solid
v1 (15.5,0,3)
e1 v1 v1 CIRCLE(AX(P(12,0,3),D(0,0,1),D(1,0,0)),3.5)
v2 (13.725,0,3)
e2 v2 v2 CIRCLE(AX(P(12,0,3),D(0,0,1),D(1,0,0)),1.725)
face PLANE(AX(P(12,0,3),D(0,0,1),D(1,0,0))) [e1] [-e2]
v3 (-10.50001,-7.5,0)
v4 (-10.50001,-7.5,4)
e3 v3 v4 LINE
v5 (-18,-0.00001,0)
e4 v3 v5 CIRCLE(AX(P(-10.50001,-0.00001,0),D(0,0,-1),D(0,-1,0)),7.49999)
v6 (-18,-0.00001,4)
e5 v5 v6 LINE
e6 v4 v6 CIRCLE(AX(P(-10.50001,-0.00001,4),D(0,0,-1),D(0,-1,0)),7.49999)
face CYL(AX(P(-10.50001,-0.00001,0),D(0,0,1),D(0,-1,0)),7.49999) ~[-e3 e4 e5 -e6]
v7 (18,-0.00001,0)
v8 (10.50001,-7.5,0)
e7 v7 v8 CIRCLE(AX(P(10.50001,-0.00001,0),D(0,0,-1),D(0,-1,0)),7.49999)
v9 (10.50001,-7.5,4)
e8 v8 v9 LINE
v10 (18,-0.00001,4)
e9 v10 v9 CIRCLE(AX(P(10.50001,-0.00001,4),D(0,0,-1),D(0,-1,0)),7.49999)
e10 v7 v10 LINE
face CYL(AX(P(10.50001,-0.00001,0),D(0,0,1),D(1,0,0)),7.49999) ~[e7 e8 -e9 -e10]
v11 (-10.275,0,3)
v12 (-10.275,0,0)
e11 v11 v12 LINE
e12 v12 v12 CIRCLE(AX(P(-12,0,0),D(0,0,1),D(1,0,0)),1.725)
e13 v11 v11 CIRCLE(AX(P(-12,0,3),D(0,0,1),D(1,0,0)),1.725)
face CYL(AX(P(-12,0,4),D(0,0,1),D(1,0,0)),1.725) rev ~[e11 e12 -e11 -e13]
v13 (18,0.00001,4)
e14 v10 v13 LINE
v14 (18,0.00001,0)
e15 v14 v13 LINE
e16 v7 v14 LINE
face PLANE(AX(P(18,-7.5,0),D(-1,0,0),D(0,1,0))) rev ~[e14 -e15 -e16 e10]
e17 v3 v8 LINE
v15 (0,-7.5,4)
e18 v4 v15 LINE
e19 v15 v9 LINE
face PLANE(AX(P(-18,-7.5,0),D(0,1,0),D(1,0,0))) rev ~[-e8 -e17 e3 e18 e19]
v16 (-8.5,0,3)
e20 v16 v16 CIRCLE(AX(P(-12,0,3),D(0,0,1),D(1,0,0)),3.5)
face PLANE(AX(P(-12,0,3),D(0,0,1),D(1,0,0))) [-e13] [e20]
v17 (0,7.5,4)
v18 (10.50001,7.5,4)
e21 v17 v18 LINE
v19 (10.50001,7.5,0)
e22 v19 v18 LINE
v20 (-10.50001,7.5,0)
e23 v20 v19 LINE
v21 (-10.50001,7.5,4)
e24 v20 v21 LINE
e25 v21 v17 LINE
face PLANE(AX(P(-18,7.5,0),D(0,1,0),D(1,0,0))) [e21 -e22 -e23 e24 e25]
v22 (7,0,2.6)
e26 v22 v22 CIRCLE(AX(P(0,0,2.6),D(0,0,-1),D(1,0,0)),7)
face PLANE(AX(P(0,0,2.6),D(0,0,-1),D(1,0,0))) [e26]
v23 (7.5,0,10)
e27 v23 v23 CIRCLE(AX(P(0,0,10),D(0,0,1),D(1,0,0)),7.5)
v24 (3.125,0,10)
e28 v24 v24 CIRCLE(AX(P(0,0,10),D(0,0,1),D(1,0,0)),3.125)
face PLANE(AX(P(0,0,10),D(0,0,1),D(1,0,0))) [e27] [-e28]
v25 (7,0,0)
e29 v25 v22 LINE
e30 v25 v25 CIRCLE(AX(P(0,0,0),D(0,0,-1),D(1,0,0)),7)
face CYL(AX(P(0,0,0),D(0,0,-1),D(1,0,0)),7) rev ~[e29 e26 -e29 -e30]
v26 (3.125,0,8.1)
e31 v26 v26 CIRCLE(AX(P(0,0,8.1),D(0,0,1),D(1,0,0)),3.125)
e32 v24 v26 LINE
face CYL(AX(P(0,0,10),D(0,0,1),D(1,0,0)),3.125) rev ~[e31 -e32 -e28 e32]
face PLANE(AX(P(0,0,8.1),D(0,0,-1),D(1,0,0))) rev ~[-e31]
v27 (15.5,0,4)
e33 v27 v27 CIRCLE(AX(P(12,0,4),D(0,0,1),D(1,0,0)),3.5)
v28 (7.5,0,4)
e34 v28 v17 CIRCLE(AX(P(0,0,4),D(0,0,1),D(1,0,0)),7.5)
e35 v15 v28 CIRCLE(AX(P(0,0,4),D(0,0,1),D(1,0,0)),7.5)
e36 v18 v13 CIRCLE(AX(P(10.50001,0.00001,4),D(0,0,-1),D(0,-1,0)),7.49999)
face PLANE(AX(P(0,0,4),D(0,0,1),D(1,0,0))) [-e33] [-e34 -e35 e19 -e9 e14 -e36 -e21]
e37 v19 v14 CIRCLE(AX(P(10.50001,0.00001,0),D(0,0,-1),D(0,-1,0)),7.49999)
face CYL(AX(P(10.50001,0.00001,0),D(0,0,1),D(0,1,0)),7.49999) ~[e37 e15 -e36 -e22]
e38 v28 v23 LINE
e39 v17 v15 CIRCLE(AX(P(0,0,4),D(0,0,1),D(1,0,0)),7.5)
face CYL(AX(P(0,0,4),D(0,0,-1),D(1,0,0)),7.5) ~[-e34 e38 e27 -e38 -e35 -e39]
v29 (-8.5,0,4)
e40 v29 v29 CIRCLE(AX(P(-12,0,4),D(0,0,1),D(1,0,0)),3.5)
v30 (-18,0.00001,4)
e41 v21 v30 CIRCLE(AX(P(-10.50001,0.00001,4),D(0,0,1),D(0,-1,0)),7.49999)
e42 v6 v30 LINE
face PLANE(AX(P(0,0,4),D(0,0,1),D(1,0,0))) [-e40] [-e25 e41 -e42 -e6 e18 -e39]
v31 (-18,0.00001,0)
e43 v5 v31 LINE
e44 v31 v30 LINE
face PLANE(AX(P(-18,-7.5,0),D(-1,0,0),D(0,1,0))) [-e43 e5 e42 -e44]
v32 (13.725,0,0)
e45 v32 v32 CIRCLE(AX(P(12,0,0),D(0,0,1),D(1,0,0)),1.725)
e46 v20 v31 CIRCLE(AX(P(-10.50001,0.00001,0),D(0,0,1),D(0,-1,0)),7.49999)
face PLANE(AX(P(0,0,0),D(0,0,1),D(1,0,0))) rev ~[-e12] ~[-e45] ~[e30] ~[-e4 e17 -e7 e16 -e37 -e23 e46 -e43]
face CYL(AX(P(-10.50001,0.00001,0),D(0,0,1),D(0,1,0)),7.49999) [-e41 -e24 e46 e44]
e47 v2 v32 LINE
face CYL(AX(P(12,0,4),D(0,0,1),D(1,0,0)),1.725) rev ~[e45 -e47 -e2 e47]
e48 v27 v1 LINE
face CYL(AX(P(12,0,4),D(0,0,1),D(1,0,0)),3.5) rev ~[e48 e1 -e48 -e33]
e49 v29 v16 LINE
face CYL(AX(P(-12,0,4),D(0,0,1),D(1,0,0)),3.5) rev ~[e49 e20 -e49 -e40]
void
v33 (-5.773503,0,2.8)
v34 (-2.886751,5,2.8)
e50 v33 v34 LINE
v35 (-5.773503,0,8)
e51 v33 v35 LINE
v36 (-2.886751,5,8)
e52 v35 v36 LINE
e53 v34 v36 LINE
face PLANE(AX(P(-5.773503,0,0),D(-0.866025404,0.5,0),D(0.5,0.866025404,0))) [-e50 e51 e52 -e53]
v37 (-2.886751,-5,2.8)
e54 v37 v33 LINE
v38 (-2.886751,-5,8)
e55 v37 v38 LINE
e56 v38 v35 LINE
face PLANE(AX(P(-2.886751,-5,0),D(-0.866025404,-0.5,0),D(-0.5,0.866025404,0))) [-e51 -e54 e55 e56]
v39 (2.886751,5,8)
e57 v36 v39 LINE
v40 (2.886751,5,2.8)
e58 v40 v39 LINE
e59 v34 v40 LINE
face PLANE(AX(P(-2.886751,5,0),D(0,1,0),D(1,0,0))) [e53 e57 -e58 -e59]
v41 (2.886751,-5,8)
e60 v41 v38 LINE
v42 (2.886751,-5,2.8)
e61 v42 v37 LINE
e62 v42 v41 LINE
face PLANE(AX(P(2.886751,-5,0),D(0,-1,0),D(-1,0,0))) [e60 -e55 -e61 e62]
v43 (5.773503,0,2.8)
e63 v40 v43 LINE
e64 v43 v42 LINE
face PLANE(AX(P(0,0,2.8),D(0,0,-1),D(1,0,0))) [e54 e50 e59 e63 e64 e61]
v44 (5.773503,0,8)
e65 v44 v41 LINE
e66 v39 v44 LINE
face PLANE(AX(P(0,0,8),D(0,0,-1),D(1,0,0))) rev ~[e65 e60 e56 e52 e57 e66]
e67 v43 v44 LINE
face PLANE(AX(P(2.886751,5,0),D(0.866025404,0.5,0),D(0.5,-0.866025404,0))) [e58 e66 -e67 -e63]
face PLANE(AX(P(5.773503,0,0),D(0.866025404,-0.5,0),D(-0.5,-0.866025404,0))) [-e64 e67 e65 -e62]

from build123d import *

# Parameters (mm, degrees)
F0_W      = 36
F0_H      = 15
F1_DEPTH  = 4
F2_R      = 7.5
F3_DEPTH  = 6
F4_R      = 7.49999
F6_DEPTH  = 8
F7_R      = 1.725
F8_DEPTH  = 4
F7_R_2    = 3.5
F9_DEPTH  = 1
F10_R     = 3.125
F11_DEPTH = 2
F12_R     = 3.2
F13_DEPTH = 0.1
F14_R     = 7
F15_DEPTH = 2.6
F17_DEPTH = 0.2


# Not quite as in the source:
# - a fillet or chamfer is up to 0.001 mm smaller than in the source, because OpenCascade refuses the exact size


with BuildPart() as f1:
    # F0 (on Top) → F1 (new body)
    with BuildSketch(Plane.XY):
        Rectangle(F0_W, F0_H)
    extrude(amount=F1_DEPTH)

    # F2 (on face) → F3 (join)
    with BuildSketch(Plane.XY.offset(4)):
        Circle(F2_R)
    extrude(amount=F3_DEPTH)

    # F4 (radius 7.5 in the source; OpenCascade refuses exactly that, so slightly less here)
    f4_edges = [f1.edges().sort_by_distance(p)[0] for p in [
        (-18, -7.5, 2),
        (-18, 7.5, 2),
        (18, -7.5, 2),
        (18, 7.5, 2),
    ]]
    fillet(f4_edges, radius=F4_R)

    # F5 (on face) → F6 (cut)
    with BuildSketch(Plane(origin=(0, 0, 0), x_dir=(1, 0, 0), z_dir=(0, 0, -1))):
        Polygon((2.8867513459, 5), (-2.8867513459, 5), (-5.7735026919, 0), (-2.8867513459, -5), (2.8867513459, -5), (5.7735026919, 0), align=None)
    extrude(amount=-F6_DEPTH, mode=Mode.SUBTRACT)

    # F7 (on face) → F8 (cut, through all)
    with BuildSketch(Plane.XY.offset(4)):
        with Locations((12, 0)):
            Circle(F7_R)
        with Locations((-12, 0)):
            Circle(F7_R)
    extrude(amount=-F8_DEPTH, mode=Mode.SUBTRACT)

    # F7 (on face) → F9 (cut)
    with BuildSketch(Plane.XY.offset(4)):
        with Locations((-12, 0)):
            Circle(F7_R_2)
        with Locations((-12, 0)):
            Circle(F7_R, mode=Mode.SUBTRACT)
        with Locations((12, 0)):
            Circle(F7_R_2)
        with Locations((12, 0)):
            Circle(F7_R, mode=Mode.SUBTRACT)
    extrude(amount=-F9_DEPTH, mode=Mode.SUBTRACT)

    # F10 (on face) → F11 (cut, through all)
    with BuildSketch(Plane.XY.offset(10)):
        Circle(F10_R)
    extrude(amount=-F11_DEPTH, mode=Mode.SUBTRACT)

    # F12 (on face) → F13 (join)
    with BuildSketch(Plane(origin=(0, 0, 8), x_dir=(1, 0, 0), z_dir=(0, 0, -1))):
        Circle(F12_R)
    extrude(amount=-F13_DEPTH)

    # F14 (on face) → F15 (cut)
    with BuildSketch(Plane(origin=(0, 0, 0), x_dir=(1, 0, 0), z_dir=(0, 0, -1))):
        Circle(F14_R)
    extrude(amount=-F15_DEPTH, mode=Mode.SUBTRACT)

    # F16 (on face) → F17 (join)
    with BuildSketch(Plane(origin=(0, 0, 2.6), x_dir=(1, 0, 0), z_dir=(0, 0, -1))):
        Polygon((2.8867513459, 5), (-2.8867513459, 5), (-5.7735026919, 0), (-2.8867513459, -5), (2.8867513459, -5), (5.7735026919, 0), align=None)
    extrude(amount=-F17_DEPTH)


solid = f1.part
